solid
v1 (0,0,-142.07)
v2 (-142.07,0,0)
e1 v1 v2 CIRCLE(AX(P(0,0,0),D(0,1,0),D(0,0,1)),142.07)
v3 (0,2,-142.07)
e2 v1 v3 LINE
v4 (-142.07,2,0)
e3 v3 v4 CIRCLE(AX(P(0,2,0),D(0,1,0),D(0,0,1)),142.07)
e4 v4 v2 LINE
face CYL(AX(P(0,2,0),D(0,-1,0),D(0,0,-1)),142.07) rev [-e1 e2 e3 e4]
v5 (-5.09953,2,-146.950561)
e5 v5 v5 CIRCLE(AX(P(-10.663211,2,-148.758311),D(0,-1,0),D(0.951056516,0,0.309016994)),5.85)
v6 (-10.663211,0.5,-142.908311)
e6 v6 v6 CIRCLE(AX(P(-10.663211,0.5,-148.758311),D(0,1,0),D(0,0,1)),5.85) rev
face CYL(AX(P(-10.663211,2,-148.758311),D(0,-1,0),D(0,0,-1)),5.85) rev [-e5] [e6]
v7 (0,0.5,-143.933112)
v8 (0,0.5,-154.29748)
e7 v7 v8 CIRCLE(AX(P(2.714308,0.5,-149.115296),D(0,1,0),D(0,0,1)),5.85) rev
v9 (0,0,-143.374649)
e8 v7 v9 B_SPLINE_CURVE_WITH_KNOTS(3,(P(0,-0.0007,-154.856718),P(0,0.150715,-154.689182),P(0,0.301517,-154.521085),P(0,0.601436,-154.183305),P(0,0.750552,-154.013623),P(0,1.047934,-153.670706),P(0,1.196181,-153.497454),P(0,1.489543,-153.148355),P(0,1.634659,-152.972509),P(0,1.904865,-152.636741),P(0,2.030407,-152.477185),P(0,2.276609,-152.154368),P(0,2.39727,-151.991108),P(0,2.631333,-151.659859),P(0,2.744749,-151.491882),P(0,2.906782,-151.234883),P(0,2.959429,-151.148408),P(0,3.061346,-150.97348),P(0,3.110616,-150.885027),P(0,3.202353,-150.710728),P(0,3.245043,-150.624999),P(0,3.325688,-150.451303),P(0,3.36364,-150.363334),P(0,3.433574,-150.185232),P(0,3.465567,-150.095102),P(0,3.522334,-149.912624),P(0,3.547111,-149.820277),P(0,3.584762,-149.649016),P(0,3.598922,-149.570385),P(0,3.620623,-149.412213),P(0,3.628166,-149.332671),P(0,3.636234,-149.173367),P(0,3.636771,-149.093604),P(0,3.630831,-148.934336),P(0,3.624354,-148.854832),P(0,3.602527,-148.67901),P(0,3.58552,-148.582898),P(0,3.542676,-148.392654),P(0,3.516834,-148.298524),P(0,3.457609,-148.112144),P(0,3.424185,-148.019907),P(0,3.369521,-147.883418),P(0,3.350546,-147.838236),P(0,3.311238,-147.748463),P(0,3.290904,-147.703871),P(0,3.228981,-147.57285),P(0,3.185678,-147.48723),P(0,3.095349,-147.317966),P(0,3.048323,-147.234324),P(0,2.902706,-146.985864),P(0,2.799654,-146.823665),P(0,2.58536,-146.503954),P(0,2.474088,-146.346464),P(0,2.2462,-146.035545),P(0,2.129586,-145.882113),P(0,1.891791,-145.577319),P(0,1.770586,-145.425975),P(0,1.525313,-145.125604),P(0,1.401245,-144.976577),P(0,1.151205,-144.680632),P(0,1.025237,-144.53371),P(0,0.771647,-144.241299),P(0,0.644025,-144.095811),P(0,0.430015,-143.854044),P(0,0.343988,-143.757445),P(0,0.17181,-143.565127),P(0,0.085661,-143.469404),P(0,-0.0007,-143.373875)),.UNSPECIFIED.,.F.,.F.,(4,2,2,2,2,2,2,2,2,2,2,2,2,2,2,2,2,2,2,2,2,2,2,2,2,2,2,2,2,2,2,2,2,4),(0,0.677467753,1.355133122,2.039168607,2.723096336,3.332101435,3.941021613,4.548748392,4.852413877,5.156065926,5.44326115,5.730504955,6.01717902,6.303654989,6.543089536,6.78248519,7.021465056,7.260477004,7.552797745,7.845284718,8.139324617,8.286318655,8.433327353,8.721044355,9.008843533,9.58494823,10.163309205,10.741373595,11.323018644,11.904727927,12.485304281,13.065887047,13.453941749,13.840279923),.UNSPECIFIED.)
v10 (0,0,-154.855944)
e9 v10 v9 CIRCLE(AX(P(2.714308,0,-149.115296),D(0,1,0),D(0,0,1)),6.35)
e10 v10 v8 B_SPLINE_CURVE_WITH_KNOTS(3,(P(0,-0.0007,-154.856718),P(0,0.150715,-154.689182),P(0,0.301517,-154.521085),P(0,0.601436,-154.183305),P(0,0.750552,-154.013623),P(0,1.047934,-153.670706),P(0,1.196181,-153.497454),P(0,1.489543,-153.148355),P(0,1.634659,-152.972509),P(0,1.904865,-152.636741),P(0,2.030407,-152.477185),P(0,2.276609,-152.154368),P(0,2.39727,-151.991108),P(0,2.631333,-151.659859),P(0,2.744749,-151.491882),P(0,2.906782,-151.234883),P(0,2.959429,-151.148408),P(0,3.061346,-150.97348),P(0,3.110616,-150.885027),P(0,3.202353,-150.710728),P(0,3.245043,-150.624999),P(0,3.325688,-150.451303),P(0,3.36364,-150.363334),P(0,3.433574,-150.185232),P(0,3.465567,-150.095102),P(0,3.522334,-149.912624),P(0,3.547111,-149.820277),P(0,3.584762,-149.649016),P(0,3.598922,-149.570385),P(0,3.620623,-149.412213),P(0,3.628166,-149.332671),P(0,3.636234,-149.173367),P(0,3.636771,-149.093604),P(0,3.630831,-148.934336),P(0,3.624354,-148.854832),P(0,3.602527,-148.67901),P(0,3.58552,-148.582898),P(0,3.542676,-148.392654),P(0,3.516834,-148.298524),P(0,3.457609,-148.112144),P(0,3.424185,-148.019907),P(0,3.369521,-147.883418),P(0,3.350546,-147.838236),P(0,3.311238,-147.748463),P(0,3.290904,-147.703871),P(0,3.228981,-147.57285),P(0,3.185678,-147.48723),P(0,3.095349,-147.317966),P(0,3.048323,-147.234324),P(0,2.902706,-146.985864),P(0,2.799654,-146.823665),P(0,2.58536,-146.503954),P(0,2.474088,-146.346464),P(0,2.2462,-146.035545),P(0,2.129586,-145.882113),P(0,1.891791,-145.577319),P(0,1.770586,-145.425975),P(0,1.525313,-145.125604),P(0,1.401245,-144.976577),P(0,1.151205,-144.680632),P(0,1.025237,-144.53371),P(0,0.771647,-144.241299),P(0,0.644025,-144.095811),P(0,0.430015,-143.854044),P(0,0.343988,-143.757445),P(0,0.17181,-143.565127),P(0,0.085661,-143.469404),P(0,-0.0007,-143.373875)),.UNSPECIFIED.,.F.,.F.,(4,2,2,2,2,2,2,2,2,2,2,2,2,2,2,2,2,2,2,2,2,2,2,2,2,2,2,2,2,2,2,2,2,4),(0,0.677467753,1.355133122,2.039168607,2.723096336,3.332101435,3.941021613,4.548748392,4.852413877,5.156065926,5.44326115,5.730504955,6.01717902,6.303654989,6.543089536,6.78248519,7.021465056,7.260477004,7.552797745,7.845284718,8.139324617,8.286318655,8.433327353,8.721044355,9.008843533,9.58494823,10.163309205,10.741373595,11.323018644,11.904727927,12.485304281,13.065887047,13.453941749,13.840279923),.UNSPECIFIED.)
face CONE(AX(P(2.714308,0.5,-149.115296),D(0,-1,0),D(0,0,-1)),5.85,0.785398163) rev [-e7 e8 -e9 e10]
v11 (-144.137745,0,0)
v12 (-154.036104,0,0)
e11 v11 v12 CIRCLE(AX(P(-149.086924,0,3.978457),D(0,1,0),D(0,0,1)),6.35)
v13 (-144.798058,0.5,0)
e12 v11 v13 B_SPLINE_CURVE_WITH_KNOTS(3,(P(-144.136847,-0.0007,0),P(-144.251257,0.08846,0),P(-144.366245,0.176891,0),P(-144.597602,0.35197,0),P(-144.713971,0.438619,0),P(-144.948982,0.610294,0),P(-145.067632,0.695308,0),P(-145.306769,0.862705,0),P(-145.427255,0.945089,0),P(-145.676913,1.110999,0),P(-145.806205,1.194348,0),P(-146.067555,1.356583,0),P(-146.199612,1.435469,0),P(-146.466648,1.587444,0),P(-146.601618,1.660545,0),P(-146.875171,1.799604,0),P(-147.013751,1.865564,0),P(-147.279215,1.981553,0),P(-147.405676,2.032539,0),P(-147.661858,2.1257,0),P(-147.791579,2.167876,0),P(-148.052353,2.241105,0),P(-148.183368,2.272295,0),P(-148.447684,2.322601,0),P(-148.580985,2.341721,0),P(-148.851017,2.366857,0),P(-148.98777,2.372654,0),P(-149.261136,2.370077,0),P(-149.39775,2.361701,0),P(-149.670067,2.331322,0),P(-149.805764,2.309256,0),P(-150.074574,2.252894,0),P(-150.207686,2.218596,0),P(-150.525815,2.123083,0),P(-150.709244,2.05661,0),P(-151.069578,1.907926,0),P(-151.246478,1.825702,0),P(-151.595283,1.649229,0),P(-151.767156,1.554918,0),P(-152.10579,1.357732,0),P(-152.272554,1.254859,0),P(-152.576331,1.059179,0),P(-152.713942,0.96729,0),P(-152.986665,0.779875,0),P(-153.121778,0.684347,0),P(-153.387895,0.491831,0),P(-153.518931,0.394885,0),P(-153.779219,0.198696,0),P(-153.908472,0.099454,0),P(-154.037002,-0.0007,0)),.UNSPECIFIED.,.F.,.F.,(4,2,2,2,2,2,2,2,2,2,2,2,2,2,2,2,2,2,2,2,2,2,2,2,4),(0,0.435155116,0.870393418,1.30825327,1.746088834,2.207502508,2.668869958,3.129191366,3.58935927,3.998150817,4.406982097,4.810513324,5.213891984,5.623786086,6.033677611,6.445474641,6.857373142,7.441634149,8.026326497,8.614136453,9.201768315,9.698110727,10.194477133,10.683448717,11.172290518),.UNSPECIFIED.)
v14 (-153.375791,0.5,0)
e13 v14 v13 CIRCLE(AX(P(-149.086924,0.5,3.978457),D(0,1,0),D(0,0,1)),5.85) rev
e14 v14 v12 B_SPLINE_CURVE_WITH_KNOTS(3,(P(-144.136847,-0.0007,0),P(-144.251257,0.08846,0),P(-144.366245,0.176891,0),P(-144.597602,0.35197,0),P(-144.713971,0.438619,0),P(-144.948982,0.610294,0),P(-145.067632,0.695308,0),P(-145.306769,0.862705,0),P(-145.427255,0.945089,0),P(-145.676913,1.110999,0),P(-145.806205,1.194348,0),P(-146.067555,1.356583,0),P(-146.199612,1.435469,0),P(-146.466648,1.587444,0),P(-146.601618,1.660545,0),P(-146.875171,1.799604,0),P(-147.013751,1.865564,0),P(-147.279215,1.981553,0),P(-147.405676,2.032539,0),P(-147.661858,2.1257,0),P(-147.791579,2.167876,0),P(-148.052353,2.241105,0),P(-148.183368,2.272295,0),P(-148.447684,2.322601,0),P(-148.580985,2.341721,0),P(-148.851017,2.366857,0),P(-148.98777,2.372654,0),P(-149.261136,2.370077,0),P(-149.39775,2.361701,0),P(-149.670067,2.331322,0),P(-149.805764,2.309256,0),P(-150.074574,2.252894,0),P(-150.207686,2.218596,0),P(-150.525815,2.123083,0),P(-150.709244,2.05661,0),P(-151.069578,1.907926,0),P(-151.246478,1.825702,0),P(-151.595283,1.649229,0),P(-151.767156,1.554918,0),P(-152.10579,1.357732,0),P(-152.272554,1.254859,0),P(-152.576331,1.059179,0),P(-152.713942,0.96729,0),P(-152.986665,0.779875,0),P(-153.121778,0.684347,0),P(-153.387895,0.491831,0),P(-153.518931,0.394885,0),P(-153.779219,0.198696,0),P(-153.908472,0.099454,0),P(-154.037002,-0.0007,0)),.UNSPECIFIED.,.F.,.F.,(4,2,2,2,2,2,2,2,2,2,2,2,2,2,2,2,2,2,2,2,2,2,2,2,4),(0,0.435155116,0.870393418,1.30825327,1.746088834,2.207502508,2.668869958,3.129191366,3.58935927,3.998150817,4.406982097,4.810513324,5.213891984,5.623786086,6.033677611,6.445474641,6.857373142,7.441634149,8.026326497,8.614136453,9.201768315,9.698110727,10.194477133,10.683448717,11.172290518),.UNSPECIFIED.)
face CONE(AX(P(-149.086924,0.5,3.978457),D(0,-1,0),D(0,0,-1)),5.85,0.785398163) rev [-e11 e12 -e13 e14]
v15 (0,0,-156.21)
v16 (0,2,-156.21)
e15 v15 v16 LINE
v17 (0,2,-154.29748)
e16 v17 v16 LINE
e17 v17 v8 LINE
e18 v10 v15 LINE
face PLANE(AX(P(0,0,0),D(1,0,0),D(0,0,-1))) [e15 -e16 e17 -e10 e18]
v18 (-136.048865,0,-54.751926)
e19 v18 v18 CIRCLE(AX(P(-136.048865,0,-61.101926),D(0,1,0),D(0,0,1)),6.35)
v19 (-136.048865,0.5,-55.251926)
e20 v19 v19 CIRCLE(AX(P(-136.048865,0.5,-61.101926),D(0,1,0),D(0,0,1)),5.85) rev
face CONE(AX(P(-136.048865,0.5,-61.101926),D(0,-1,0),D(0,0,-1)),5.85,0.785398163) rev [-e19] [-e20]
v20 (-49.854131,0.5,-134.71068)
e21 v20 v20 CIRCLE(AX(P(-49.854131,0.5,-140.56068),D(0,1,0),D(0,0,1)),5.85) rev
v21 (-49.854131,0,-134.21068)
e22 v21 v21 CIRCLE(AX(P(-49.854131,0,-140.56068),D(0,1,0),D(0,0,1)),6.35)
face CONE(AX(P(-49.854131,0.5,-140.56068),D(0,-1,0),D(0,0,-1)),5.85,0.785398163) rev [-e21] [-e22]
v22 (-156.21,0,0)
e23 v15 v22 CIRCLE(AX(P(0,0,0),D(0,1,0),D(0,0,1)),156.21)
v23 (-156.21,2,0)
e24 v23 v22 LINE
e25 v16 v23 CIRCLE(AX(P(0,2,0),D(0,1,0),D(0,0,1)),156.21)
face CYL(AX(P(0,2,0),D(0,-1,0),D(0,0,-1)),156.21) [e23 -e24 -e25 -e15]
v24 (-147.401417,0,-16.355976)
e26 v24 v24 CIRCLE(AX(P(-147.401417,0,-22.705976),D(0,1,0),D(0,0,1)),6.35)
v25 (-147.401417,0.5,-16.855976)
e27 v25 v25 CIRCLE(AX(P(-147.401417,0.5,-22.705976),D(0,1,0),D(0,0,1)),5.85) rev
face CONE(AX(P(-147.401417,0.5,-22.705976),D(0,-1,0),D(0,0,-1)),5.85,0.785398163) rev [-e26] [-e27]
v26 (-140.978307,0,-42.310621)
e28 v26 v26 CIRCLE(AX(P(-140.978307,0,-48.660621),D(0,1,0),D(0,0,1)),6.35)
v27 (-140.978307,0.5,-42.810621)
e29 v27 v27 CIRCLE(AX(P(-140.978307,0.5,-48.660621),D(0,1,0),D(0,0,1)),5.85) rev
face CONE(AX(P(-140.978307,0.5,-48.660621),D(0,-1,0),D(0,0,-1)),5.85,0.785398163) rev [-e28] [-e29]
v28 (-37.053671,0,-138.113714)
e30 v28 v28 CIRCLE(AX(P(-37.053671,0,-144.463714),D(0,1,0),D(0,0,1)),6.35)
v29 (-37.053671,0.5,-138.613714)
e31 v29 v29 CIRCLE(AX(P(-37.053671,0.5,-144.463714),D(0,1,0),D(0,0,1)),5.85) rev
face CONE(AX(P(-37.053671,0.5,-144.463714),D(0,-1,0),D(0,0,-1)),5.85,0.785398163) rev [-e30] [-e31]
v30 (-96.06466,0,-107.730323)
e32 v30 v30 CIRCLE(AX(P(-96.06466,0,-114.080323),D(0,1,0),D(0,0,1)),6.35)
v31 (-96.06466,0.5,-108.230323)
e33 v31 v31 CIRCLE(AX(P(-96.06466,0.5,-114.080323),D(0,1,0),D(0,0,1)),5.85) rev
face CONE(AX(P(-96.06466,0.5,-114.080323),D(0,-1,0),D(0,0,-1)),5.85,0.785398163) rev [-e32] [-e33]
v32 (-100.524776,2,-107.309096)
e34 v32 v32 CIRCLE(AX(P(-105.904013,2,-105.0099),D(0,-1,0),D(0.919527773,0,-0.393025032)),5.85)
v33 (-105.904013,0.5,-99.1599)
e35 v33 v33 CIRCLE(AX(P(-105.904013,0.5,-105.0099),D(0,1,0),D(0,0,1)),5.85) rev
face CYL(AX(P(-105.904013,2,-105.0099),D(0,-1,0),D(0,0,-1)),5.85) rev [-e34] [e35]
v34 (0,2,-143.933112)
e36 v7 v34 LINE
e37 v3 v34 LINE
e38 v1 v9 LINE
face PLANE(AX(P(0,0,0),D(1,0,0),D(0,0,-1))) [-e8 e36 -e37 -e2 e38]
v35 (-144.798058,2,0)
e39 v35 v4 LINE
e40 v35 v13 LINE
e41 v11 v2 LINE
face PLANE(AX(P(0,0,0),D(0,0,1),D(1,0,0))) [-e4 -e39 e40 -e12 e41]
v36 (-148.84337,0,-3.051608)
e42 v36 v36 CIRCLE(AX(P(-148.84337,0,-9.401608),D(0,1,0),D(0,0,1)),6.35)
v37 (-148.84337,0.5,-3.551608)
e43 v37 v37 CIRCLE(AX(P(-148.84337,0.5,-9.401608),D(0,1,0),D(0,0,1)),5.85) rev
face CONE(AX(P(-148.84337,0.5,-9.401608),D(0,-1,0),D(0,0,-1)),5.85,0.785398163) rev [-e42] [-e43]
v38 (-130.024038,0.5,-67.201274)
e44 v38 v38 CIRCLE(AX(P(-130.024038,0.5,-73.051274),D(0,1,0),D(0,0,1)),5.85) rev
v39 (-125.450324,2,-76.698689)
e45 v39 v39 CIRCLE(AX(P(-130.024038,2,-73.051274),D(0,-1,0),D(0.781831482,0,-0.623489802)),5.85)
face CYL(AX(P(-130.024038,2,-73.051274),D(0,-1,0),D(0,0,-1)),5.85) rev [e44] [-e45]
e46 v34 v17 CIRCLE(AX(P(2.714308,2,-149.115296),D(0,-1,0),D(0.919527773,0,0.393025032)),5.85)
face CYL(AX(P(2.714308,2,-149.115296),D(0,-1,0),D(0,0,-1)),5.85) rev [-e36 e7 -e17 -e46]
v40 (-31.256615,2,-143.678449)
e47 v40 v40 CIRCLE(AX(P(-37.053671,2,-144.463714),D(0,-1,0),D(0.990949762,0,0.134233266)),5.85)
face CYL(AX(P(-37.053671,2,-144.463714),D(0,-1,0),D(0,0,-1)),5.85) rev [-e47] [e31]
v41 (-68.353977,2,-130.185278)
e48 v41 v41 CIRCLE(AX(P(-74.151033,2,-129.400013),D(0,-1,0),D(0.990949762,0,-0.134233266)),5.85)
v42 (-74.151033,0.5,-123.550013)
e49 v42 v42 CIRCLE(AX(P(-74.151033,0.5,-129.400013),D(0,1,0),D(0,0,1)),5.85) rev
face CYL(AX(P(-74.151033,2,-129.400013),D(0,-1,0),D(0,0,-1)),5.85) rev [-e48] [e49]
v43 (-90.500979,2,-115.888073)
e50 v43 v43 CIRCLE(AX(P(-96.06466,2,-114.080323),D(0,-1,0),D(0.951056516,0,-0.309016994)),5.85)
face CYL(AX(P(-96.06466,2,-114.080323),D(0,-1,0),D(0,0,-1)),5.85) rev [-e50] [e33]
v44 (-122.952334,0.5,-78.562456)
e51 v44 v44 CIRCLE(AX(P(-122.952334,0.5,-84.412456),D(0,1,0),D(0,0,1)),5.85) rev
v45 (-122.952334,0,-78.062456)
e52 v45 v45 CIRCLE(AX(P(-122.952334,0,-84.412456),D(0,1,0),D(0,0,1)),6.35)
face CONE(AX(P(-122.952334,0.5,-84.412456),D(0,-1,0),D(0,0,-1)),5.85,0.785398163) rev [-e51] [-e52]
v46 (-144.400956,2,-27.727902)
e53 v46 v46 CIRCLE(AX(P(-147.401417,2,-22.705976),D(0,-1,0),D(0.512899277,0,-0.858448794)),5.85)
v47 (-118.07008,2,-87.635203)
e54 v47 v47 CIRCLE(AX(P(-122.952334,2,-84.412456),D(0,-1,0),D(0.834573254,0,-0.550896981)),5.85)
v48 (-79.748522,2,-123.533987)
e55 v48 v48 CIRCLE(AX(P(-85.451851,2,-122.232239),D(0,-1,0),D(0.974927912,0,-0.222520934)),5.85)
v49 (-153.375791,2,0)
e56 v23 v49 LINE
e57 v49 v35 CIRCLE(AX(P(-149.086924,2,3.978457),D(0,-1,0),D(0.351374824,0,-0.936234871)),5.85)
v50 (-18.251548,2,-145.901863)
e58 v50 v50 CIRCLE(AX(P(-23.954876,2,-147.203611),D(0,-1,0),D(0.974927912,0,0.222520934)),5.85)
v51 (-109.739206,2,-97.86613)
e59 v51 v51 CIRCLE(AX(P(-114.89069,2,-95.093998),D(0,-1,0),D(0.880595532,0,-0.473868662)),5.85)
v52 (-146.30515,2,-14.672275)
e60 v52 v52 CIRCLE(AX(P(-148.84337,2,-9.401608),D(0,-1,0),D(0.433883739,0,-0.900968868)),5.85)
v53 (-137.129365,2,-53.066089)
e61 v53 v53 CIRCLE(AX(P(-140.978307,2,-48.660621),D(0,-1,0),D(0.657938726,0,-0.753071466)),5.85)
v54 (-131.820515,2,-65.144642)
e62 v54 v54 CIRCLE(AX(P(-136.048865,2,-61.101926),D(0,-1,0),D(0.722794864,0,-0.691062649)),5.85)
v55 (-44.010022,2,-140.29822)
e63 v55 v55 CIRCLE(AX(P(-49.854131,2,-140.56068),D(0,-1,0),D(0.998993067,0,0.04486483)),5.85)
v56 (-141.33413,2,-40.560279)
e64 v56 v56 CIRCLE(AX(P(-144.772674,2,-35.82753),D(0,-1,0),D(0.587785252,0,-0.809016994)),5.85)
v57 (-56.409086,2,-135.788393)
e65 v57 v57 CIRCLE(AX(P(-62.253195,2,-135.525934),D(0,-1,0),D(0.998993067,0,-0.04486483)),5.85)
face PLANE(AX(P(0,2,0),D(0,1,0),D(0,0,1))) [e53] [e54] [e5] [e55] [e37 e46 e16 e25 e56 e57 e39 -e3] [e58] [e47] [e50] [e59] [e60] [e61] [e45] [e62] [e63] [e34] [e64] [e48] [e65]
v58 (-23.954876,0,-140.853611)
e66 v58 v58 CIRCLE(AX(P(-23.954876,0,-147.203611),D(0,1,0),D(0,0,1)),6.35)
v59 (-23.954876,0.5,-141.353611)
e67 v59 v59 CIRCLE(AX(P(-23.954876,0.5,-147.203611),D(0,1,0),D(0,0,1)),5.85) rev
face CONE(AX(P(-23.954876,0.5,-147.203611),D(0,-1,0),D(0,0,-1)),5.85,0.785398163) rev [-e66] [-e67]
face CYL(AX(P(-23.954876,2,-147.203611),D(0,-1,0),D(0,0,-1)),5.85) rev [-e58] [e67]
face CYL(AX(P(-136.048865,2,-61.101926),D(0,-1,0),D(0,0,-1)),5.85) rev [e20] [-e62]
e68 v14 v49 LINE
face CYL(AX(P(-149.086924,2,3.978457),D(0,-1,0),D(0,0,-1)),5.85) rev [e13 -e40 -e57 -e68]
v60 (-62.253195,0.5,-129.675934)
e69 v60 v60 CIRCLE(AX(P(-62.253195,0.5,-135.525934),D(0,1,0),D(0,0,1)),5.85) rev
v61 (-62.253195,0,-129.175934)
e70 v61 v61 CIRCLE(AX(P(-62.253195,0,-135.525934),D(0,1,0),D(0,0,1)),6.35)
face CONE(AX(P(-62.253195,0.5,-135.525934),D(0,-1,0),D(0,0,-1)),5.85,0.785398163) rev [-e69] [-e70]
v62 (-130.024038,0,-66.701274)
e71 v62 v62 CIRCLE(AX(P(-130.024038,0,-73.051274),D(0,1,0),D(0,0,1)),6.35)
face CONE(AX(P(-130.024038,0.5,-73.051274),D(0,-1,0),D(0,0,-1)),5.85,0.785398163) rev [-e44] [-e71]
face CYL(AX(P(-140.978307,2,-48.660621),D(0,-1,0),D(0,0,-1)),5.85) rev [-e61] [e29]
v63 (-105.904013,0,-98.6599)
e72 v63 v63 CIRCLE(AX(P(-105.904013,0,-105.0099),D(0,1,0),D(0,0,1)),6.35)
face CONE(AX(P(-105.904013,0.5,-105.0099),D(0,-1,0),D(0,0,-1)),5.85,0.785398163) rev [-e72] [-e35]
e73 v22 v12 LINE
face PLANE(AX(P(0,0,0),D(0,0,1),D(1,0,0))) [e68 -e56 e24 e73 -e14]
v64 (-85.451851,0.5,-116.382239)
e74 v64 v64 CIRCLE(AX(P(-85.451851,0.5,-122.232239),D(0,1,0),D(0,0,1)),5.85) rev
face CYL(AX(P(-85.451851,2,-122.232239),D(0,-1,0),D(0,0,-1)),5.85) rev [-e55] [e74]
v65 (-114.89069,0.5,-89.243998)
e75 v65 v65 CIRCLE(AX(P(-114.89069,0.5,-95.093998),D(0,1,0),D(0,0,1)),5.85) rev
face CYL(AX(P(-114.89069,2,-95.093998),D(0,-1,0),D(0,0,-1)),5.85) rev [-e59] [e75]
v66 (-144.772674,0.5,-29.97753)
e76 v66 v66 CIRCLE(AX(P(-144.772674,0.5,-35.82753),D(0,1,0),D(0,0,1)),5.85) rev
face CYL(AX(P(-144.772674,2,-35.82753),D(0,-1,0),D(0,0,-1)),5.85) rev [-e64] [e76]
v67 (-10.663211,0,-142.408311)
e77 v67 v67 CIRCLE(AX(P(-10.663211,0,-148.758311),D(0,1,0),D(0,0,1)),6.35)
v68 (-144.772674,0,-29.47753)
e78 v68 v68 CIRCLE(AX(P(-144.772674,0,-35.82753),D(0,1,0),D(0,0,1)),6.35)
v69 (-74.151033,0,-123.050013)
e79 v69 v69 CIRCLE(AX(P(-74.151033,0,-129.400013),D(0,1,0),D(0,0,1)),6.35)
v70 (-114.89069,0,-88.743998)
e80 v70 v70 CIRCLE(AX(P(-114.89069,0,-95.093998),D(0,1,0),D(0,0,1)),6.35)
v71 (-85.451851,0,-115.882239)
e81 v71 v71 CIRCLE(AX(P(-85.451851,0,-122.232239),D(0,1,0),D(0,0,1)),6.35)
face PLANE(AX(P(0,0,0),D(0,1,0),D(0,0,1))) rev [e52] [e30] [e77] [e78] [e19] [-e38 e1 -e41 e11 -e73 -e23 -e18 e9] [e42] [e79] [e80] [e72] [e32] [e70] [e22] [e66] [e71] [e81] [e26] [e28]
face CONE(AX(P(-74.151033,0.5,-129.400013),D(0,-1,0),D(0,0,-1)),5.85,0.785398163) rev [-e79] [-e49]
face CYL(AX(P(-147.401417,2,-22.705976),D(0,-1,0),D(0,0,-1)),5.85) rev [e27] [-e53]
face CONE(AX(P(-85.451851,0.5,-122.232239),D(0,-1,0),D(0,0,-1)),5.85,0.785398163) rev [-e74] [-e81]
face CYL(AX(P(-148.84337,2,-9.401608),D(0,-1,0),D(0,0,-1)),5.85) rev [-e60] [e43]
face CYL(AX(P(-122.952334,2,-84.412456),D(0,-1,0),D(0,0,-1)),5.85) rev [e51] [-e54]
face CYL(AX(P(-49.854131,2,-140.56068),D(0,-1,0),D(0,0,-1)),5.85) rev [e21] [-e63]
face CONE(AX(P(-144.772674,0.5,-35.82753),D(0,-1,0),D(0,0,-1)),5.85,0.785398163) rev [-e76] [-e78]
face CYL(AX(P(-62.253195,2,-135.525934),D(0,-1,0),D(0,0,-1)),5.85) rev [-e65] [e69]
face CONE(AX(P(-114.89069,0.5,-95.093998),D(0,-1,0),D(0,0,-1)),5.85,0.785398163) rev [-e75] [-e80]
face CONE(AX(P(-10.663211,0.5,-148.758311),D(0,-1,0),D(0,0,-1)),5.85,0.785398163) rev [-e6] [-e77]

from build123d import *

# Parameters (mm, degrees)
ESQUISSE1_R                               = 156.21
ESQUISSE1_R_2                             = 142.07
BOSS_EXTRU_1_DEPTH                        = 2
ESQUISSE2_R                               = 5.85
ENL_V_MAT_EXTRU_1_DEPTH                   = 2
CHANFREIN1_SIZE                           = 0.5
R_P_TITION_CIRCULAIRE1_COUNT              = 70
CHANFREIN1_OF_R_P_TITION_CIRCULAIRE1_SIZE = 0.5
INTERSECT4_OUTLINE_R                      = 5.85
INTERSECT4_DEPTH                          = 2


# Read off the part's stored shape, not the designer's step: Intersect4
with BuildPart() as part:
    # Esquisse1 → Boss.-Extru.1 (new body)
    with BuildSketch(Plane(origin=(0, 0, 0), x_dir=(1, 0, 0), z_dir=(0, 1, 0))):
        with Locations(Location((0, 0, 0), (0, 0, 270))):
            Circle(ESQUISSE1_R)
        with Locations(Location((0, 0, 0), (0, 0, 270))):
            Circle(ESQUISSE1_R_2, mode=Mode.SUBTRACT)
    extrude(amount=BOSS_EXTRU_1_DEPTH)

    # Esquisse2 → Enlèv. mat.-Extru.1 (cut)
    with BuildSketch(Plane.XZ):
        with Locations(Location((-138.182447366, 56.110162301, 0), (0, 0, 270))):
            Circle(ESQUISSE2_R)
    enl_v_mat_extru_1 = extrude(amount=-ENL_V_MAT_EXTRU_1_DEPTH, mode=Mode.SUBTRACT)

    # Chanfrein1
    chanfrein1_edges = [part.edges().sort_by_distance(p)[0] for p in [
        (-138.182447366, 0, 61.960162301),
    ]]
    chamfer(chanfrein1_edges, length=CHANFREIN1_SIZE)

    # Répétition circulaire1: Enlèv. mat.-Extru.1 ×70 about axis
    r_p_tition_circulaire1_axis = Axis((0, 0, 0), (0, 1, 0))
    for i in range(1, R_P_TITION_CIRCULAIRE1_COUNT):
        add(enl_v_mat_extru_1.rotate(r_p_tition_circulaire1_axis, i * 360 / R_P_TITION_CIRCULAIRE1_COUNT), mode=Mode.SUBTRACT)

    # Chanfrein1 of Répétition circulaire1
    chanfrein1_of_r_p_tition_circulaire1_edges = [part.edges().sort_by_distance(p)[0] for p in [
        (-132.07209933, 0, 74.097307988),
        (-124.898384407, 0, 85.63786572),
        (-116.719061132, 0, 96.488917711),
        (-107.599984606, 0, 106.563097671),
        (-97.614576272, 0, 115.779294227),
        (-86.843232766, 0, 124.063303983),
        (-75.372678613, 0, 131.348428963),
        (-63.295267971, 0, 137.576013625),
        (-50.708241047, 0, 142.695917119),
        (-37.712941183, 0, 146.666916991),
        (-24.413998891, 0, 149.457041087),
        (-10.918489435, 0, 151.043824968),
        (2.664929277, 0, 151.414492782),
        (16.226891547, 0, 150.56606013),
        (29.658204426, 0, 148.505358094),
        (42.850726883, 0, 145.248978234),
        (55.698240482, 0, 140.823139006),
        (68.097304599, 0, 135.263474666),
        (79.94808926, 0, 128.614748362),
        (91.155178915, 0, 120.930491727),
        (101.628340667, 0, 112.27257388),
        (111.283250778, 0, 102.710703283),
        (120.042173586, 0, 92.321866495),
        (127.834587396, 0, 81.189708324),
        (134.597752274, 0, 69.403858359),
        (140.277215193, 0, 57.059209336),
        (144.827248457, 0, 44.255153109),
        (148.211217874, 0, 31.094780412),
        (150.40187771, 0, 17.684050826),
        (151.381590063, 0, 4.13093966),
        (151.142466863, 0, -9.455431402),
        (149.68643339, 0, -22.965672891),
        (147.02521277, 0, -36.291008285),
        (143.180231586, 0, -49.324149819),
        (138.182447366, 0, -61.960162301),
        (132.07209933, 0, -74.097307988),
        (124.898384407, 0, -85.63786572),
        (116.719061132, 0, -96.488917711),
        (107.599984606, 0, -106.563097671),
        (97.614576272, 0, -115.779294227),
        (86.843232766, 0, -124.063303983),
        (75.372678613, 0, -131.348428963),
        (63.295267971, 0, -137.576013625),
        (50.708241047, 0, -142.695917119),
        (37.712941183, 0, -146.666916991),
        (24.413998891, 0, -149.457041087),
        (10.918489435, 0, -151.043824968),
        (-2.664929277, 0, -151.414492782),
        (-16.226891547, 0, -150.56606013),
        (-29.658204426, 0, -148.505358094),
        (-42.850726883, 0, -145.248978234),
        (-55.698240482, 0, -140.823139006),
        (-68.097304599, 0, -135.263474666),
        (-79.94808926, 0, -128.614748362),
        (-91.155178915, 0, -120.930491727),
        (-101.628340667, 0, -112.27257388),
        (-111.283250778, 0, -102.710703283),
        (-120.042173586, 0, -92.321866495),
        (-127.834587396, 0, -81.189708324),
        (-134.597752274, 0, -69.403858359),
        (-140.277215193, 0, -57.059209336),
        (-144.827248457, 0, -44.255153109),
        (-148.211217874, 0, -31.094780412),
        (-150.40187771, 0, -17.684050826),
        (-151.381590063, 0, -4.13093966),
        (-151.142466863, 0, 9.455431402),
        (-149.68643339, 0, 22.965672891),
        (-147.02521277, 0, 36.291008285),
        (-143.180231586, 0, 49.324149819),
    ]]
    chamfer(chanfrein1_of_r_p_tition_circulaire1_edges, length=CHANFREIN1_OF_R_P_TITION_CIRCULAIRE1_SIZE)

    # Intersect4 outline → Intersect4 (cut)
    with BuildSketch(Plane(origin=(0, 0, 0), x_dir=(1, 0, 0), z_dir=(0, 1, 0))):
        with BuildLine():
            Line((0, 156.21), (0, 154.29748035))
            ThreePointArc((0, 154.29748035), (8.564308192, 149.115296347), (0, 143.933112344))
            Line((0, 143.933112344), (0, 142.07))
            ThreePointArc((0, 142.07), (100.458660403, -100.458660403), (-142.07, 0))
            Line((-142.07, 0), (-144.79805755, 0))
            ThreePointArc((-144.79805755, 0), (-149.086924142, -9.828457409), (-153.375790734, 0))
            Line((-153.375790734, 0), (-156.21, 0))
            ThreePointArc((-156.21, 0), (110.457150289, -110.457150289), (0, 156.21))
        make_face()
        with Locations((-89.843693539, -119.04137854)):
            Circle(INTERSECT4_OUTLINE_R, mode=Mode.SUBTRACT)
        with Locations((-78.811222339, -126.615679546)):
            Circle(INTERSECT4_OUTLINE_R, mode=Mode.SUBTRACT)
        with Locations((-118.275376678, -90.849734976)):
            Circle(INTERSECT4_OUTLINE_R, mode=Mode.SUBTRACT)
        with Locations((-125.942942241, -79.881877626)):
            Circle(INTERSECT4_OUTLINE_R, mode=Mode.SUBTRACT)
        with Locations((-100.152796146, -110.50862635)):
            Circle(INTERSECT4_OUTLINE_R, mode=Mode.SUBTRACT)
        with Locations((-109.655527327, -101.086123678)):
            Circle(INTERSECT4_OUTLINE_R, mode=Mode.SUBTRACT)
        with Locations((-54.936591001, -138.653200622)):
            Circle(INTERSECT4_OUTLINE_R, mode=Mode.SUBTRACT)
        with Locations((-42.286655355, -143.019501651)):
            Circle(INTERSECT4_OUTLINE_R, mode=Mode.SUBTRACT)
        with Locations((-67.144209517, -133.170545549)):
            Circle(INTERSECT4_OUTLINE_R, mode=Mode.SUBTRACT)
        with Locations((-29.296252425, -146.234293746)):
            Circle(INTERSECT4_OUTLINE_R, mode=Mode.SUBTRACT)
        with Locations((-16.069973297, -148.271693292)):
            Circle(INTERSECT4_OUTLINE_R, mode=Mode.SUBTRACT)
        with Locations((-2.714308192, -149.115296347)):
            Circle(INTERSECT4_OUTLINE_R, mode=Mode.SUBTRACT)
        with Locations((-132.596489287, -68.270858368)):
            Circle(INTERSECT4_OUTLINE_R, mode=Mode.SUBTRACT)
        with Locations((-138.182447366, -56.110162301)):
            Circle(INTERSECT4_OUTLINE_R, mode=Mode.SUBTRACT)
        with Locations((-142.655841629, -43.497700199)):
            Circle(INTERSECT4_OUTLINE_R, mode=Mode.SUBTRACT)
        with Locations((-145.980654936, -30.535020192)):
            Circle(INTERSECT4_OUTLINE_R, mode=Mode.SUBTRACT)
        with Locations((-148.130117844, -17.326490156)):
            Circle(INTERSECT4_OUTLINE_R, mode=Mode.SUBTRACT)
        with Locations((10.663210926, -148.758310713)):
            Circle(INTERSECT4_OUTLINE_R, mode=Mode.SUBTRACT)
        with Locations((23.95487614, -147.20361063)):
            Circle(INTERSECT4_OUTLINE_R, mode=Mode.SUBTRACT)
        with Locations((37.053670776, -144.463713629)):
            Circle(INTERSECT4_OUTLINE_R, mode=Mode.SUBTRACT)
        with Locations((49.854131043, -140.560679749)):
            Circle(INTERSECT4_OUTLINE_R, mode=Mode.SUBTRACT)
        with Locations((62.25319516, -135.525933924)):
            Circle(INTERSECT4_OUTLINE_R, mode=Mode.SUBTRACT)
        with Locations((74.151033153, -129.400012967)):
            Circle(INTERSECT4_OUTLINE_R, mode=Mode.SUBTRACT)
        with Locations((85.451850628, -122.232239191)):
            Circle(INTERSECT4_OUTLINE_R, mode=Mode.SUBTRACT)
        with Locations((96.064660047, -114.080323297)):
            Circle(INTERSECT4_OUTLINE_R, mode=Mode.SUBTRACT)
        with Locations((105.904013308, -105.009899718)):
            Circle(INTERSECT4_OUTLINE_R, mode=Mode.SUBTRACT)
        with Locations((114.890689725, -95.093998171)):
            Circle(INTERSECT4_OUTLINE_R, mode=Mode.SUBTRACT)
        with Locations((122.952333862, -84.412455665)):
            Circle(INTERSECT4_OUTLINE_R, mode=Mode.SUBTRACT)
        with Locations((130.024038102, -73.0512737)):
            Circle(INTERSECT4_OUTLINE_R, mode=Mode.SUBTRACT)
        with Locations((136.04886524, -61.101925832)):
            Circle(INTERSECT4_OUTLINE_R, mode=Mode.SUBTRACT)
        with Locations((140.97830691, -48.660621186)):
            Circle(INTERSECT4_OUTLINE_R, mode=Mode.SUBTRACT)
        with Locations((144.772674148, -35.827529829)):
            Circle(INTERSECT4_OUTLINE_R, mode=Mode.SUBTRACT)
        with Locations((147.401416938, -22.705976268)):
            Circle(INTERSECT4_OUTLINE_R, mode=Mode.SUBTRACT)
        with Locations((148.843370189, -9.401607537)):
            Circle(INTERSECT4_OUTLINE_R, mode=Mode.SUBTRACT)
        with Locations((149.086924142, 3.978457409)):
            Circle(INTERSECT4_OUTLINE_R, mode=Mode.SUBTRACT)
        with Locations((148.130117844, 17.326490156)):
            Circle(INTERSECT4_OUTLINE_R, mode=Mode.SUBTRACT)
        with Locations((145.980654936, 30.535020192)):
            Circle(INTERSECT4_OUTLINE_R, mode=Mode.SUBTRACT)
        with Locations((142.655841629, 43.497700199)):
            Circle(INTERSECT4_OUTLINE_R, mode=Mode.SUBTRACT)
        with Locations((138.182447366, 56.110162301)):
            Circle(INTERSECT4_OUTLINE_R, mode=Mode.SUBTRACT)
        with Locations((132.596489287, 68.270858368)):
            Circle(INTERSECT4_OUTLINE_R, mode=Mode.SUBTRACT)
        with Locations((16.069973297, 148.271693292)):
            Circle(INTERSECT4_OUTLINE_R, mode=Mode.SUBTRACT)
        with Locations((29.296252425, 146.234293746)):
            Circle(INTERSECT4_OUTLINE_R, mode=Mode.SUBTRACT)
        with Locations((67.144209517, 133.170545549)):
            Circle(INTERSECT4_OUTLINE_R, mode=Mode.SUBTRACT)
        with Locations((42.286655355, 143.019501651)):
            Circle(INTERSECT4_OUTLINE_R, mode=Mode.SUBTRACT)
        with Locations((54.936591001, 138.653200622)):
            Circle(INTERSECT4_OUTLINE_R, mode=Mode.SUBTRACT)
        with Locations((109.655527327, 101.086123678)):
            Circle(INTERSECT4_OUTLINE_R, mode=Mode.SUBTRACT)
        with Locations((100.152796146, 110.50862635)):
            Circle(INTERSECT4_OUTLINE_R, mode=Mode.SUBTRACT)
        with Locations((125.942942241, 79.881877626)):
            Circle(INTERSECT4_OUTLINE_R, mode=Mode.SUBTRACT)
        with Locations((118.275376678, 90.849734976)):
            Circle(INTERSECT4_OUTLINE_R, mode=Mode.SUBTRACT)
        with Locations((78.811222339, 126.615679546)):
            Circle(INTERSECT4_OUTLINE_R, mode=Mode.SUBTRACT)
        with Locations((89.843693539, 119.04137854)):
            Circle(INTERSECT4_OUTLINE_R, mode=Mode.SUBTRACT)
    extrude(amount=INTERSECT4_DEPTH, mode=Mode.SUBTRACT)


solid = part.part
